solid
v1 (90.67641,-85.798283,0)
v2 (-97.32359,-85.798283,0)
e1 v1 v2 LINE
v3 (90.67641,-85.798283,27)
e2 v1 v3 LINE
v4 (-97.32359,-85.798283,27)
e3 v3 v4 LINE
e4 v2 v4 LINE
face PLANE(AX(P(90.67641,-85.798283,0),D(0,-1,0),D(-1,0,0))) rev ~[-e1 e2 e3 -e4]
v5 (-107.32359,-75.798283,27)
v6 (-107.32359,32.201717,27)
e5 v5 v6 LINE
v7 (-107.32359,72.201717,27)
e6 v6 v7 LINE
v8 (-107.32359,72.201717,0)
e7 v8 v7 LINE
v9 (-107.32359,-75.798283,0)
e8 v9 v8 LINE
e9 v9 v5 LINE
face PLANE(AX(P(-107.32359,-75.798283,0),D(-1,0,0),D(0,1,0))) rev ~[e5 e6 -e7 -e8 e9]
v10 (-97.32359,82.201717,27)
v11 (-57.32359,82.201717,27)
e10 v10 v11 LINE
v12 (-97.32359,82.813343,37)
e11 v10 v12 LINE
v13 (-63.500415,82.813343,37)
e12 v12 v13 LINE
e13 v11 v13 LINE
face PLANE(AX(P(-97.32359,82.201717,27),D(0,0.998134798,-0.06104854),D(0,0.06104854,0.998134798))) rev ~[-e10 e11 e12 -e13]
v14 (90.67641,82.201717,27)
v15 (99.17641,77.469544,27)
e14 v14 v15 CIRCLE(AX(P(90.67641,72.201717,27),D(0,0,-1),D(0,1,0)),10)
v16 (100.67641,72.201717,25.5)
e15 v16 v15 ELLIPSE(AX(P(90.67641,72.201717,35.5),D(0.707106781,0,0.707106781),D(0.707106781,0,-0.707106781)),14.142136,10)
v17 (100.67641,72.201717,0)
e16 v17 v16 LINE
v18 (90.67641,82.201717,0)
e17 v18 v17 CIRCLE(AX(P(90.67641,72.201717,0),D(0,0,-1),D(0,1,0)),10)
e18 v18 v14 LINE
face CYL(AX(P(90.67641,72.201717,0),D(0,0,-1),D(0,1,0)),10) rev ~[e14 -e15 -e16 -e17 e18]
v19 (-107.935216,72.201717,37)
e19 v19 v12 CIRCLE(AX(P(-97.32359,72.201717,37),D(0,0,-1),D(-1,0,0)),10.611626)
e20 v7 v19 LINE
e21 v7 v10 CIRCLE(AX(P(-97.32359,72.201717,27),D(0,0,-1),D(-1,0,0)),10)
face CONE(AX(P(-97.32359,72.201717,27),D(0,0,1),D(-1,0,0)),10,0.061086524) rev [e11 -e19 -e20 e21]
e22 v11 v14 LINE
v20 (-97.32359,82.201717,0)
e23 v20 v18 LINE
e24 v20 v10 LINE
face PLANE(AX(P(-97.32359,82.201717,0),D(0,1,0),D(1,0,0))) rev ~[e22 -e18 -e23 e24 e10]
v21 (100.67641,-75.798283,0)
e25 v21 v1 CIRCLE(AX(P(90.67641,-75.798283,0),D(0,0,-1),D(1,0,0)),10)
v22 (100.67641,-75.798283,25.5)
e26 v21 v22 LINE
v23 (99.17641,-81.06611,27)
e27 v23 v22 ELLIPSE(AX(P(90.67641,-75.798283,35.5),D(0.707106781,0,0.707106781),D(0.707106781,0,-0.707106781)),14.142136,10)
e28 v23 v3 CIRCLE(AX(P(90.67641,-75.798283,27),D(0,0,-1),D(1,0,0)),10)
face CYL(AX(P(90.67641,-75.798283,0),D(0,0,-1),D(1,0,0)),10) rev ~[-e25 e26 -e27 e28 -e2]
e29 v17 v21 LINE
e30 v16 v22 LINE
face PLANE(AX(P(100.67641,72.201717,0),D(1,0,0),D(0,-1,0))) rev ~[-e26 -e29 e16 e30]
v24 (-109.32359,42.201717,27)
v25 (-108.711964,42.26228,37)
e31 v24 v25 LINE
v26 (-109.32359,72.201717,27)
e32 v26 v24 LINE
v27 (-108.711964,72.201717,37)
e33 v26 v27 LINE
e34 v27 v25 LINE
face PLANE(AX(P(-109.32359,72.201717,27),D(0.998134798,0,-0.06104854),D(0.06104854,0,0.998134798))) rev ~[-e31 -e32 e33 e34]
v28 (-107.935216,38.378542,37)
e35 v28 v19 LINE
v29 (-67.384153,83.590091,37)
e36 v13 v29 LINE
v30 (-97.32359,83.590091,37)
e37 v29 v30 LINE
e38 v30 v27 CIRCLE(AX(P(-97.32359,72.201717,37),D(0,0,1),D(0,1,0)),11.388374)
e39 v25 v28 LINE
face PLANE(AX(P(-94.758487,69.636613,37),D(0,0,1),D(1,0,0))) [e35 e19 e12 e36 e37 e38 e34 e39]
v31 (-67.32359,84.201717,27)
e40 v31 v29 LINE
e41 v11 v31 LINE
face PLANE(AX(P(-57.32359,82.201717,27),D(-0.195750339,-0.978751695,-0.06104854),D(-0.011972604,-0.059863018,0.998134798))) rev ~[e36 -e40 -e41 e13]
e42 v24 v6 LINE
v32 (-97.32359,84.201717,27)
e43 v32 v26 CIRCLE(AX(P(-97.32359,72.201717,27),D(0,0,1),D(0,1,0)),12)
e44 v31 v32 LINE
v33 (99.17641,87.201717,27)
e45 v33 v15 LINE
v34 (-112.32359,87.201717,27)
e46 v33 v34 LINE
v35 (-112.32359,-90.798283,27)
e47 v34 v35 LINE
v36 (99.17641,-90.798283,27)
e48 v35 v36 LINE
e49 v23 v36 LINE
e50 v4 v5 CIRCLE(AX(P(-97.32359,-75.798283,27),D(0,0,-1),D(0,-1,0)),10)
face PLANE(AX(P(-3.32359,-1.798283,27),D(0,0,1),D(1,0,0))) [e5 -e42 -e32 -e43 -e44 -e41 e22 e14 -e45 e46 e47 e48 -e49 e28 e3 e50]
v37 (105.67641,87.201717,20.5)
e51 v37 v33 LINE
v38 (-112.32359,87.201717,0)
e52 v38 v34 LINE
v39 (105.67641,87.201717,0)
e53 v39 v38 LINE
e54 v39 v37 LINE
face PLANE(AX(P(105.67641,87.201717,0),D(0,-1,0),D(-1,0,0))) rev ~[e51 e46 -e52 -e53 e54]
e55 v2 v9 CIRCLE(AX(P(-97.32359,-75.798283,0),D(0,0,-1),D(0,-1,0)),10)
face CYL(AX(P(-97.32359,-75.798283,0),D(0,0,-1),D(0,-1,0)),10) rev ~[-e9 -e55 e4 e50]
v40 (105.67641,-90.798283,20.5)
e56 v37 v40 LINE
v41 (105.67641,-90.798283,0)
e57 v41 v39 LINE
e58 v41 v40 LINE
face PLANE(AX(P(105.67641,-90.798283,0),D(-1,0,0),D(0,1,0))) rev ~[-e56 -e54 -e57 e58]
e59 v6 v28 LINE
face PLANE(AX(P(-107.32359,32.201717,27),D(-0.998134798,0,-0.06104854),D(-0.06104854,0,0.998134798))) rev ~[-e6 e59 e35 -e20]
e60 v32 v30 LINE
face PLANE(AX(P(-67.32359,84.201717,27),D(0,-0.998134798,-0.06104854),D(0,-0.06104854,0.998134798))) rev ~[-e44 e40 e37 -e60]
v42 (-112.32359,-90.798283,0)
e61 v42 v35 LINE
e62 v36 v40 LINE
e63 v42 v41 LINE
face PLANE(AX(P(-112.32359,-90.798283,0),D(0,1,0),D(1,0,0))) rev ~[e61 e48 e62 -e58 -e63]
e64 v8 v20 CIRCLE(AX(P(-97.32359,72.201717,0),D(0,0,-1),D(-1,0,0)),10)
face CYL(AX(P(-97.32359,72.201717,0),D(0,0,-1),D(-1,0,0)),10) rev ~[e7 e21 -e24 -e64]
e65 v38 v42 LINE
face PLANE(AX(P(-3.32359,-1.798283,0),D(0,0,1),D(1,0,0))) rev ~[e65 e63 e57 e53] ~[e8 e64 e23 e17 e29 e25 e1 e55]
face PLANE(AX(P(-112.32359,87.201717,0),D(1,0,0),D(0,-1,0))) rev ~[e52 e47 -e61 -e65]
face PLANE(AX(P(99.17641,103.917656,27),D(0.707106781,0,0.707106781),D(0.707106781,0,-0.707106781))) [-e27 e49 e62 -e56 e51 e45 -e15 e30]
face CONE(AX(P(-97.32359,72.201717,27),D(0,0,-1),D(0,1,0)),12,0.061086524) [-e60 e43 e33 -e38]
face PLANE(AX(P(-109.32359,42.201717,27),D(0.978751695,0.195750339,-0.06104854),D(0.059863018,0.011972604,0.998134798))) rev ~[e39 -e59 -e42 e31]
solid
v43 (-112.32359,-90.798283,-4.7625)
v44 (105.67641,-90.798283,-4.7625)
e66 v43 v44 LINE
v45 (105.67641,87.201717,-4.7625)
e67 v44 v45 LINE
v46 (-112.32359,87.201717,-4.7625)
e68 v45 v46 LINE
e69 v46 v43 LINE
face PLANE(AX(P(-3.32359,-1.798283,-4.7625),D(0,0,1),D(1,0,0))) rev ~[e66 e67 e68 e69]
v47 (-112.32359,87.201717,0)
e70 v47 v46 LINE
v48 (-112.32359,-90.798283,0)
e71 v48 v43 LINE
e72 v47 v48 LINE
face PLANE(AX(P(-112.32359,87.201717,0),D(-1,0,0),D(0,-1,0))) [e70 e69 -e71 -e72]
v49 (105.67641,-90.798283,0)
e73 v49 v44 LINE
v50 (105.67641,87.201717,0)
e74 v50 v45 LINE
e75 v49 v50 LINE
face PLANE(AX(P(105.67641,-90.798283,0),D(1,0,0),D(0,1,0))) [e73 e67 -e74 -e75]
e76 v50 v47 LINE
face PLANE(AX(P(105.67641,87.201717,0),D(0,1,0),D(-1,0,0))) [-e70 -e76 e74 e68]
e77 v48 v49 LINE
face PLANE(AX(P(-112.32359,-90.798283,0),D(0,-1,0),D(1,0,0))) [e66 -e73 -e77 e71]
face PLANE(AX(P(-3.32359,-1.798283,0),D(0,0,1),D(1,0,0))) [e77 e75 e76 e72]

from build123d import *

# Parameters (mm, degrees)
F1_DEPTH    = 27
F2_T1_DEPTH = 211.4318788436
F3_DEPTH    = 4.7625
F5_DEPTH    = 10
F5_TAPER    = 3.5


# Not quite as in the source:
# - a fillet or chamfer that OpenCascade refuses, or shapes differently, is made with other operations: its cross-section is extruded or revolved along the edge and cut away or added
# - a length typed as a fraction of an inch, garbled in the dataset ("3 / 203.2 mm" for 3/8 in), is restored
# - a feature names something its author has since deleted; it is built from what else it names


with BuildPart() as f1:
    # F0 (on Top) → F1 (new body)
    with BuildSketch(Plane.XY):
        Polygon((-112.323590219, 87.2017167807), (-112.323590219, -90.7982832193), (105.676409781, -90.7982832193), (105.676409781, 77.2017167807), (105.676409781, 87.2017167807), align=None)
        with BuildLine():
            ThreePointArc((-107.323590219, 72.2017167807), (-104.3946580309, 79.2727845925), (-97.323590219, 82.2017167807))
            Line((-97.323590219, 82.2017167807), (90.676409781, 82.2017167807))
            ThreePointArc((90.676409781, 82.2017167807), (97.7474775928, 79.2727845925), (100.676409781, 72.2017167807))
            Line((100.676409781, 72.2017167807), (100.676409781, -75.7982832193))
            ThreePointArc((100.676409781, -75.7982832193), (97.7474775928, -82.8693510312), (90.676409781, -85.7982832193))
            Line((90.676409781, -85.7982832193), (-97.323590219, -85.7982832193))
            ThreePointArc((-97.323590219, -85.7982832193), (-104.3946580309, -82.8693510312), (-107.323590219, -75.7982832193))
            Line((-107.323590219, -75.7982832193), (-107.323590219, 72.2017167807))
        make_face(mode=Mode.SUBTRACT)
    extrude(amount=F1_DEPTH)

    # F2: chamfer of 6.5 on 1 edges, made by hand

    # F2_s2 → F2_t1 (cut)
    with BuildSketch(Plane.XZ.offset(-103.9176562024)):
        Polygon((99.176409781, 27), (105.676409781, 20.5), (105.676409781, 27), align=None)
    extrude(amount=F2_T1_DEPTH, mode=Mode.SUBTRACT)

    # F4 (on face) → F5 (join)
    with BuildSketch(Plane.XY.offset(27)):
        with BuildLine():
            ThreePointArc((-107.323590219, 72.2017167807), (-104.3946580309, 79.2727845925), (-97.323590219, 82.2017167807))
            Line((-97.323590219, 82.2017167807), (-57.323590219, 82.2017167807))
            Line((-57.323590219, 82.2017167807), (-67.323590219, 84.2017167807))
            Line((-67.323590219, 84.2017167807), (-97.323590219, 84.2017167807))
            ThreePointArc((-97.323590219, 84.2017167807), (-105.8088715933, 80.6869981549), (-109.323590219, 72.2017167807))
            Line((-109.323590219, 72.2017167807), (-109.323590219, 42.2017167807))
            Line((-109.323590219, 42.2017167807), (-107.323590219, 32.2017167807))
            Line((-107.323590219, 32.2017167807), (-107.323590219, 72.2017167807))
        make_face()
    extrude(amount=F5_DEPTH, taper=F5_TAPER)


with BuildPart() as f3:
    # F0 (on Top) → F3 (new body)
    with BuildSketch(Plane.XY):
        Polygon((-112.323590219, 87.2017167807), (-112.323590219, -90.7982832193), (105.676409781, -90.7982832193), (105.676409781, 77.2017167807), (105.676409781, 87.2017167807), align=None)
        with BuildLine():
            ThreePointArc((-107.323590219, 72.2017167807), (-104.3946580309, 79.2727845925), (-97.323590219, 82.2017167807))
            Line((-97.323590219, 82.2017167807), (90.676409781, 82.2017167807))
            ThreePointArc((90.676409781, 82.2017167807), (97.7474775928, 79.2727845925), (100.676409781, 72.2017167807))
            Line((100.676409781, 72.2017167807), (100.676409781, -75.7982832193))
            ThreePointArc((100.676409781, -75.7982832193), (97.7474775928, -82.8693510312), (90.676409781, -85.7982832193))
            Line((90.676409781, -85.7982832193), (-97.323590219, -85.7982832193))
            ThreePointArc((-97.323590219, -85.7982832193), (-104.3946580309, -82.8693510312), (-107.323590219, -75.7982832193))
            Line((-107.323590219, -75.7982832193), (-107.323590219, 72.2017167807))
        make_face(mode=Mode.SUBTRACT)
        with BuildLine():
            Line((90.676409781, 82.2017167807), (-97.323590219, 82.2017167807))
            ThreePointArc((-97.323590219, 82.2017167807), (-104.3946580309, 79.2727845925), (-107.323590219, 72.2017167807))
            Line((-107.323590219, 72.2017167807), (-107.323590219, -75.7982832193))
            ThreePointArc((-107.323590219, -75.7982832193), (-104.3946580309, -82.8693510312), (-97.323590219, -85.7982832193))
            Line((-97.323590219, -85.7982832193), (90.676409781, -85.7982832193))
            ThreePointArc((90.676409781, -85.7982832193), (97.7474775928, -82.8693510312), (100.676409781, -75.7982832193))
            Line((100.676409781, -75.7982832193), (100.676409781, 72.2017167807))
            ThreePointArc((100.676409781, 72.2017167807), (97.7474775928, 79.2727845925), (90.676409781, 82.2017167807))
        make_face()
    extrude(amount=-F3_DEPTH)


solid = Compound([f1.part, f3.part])
